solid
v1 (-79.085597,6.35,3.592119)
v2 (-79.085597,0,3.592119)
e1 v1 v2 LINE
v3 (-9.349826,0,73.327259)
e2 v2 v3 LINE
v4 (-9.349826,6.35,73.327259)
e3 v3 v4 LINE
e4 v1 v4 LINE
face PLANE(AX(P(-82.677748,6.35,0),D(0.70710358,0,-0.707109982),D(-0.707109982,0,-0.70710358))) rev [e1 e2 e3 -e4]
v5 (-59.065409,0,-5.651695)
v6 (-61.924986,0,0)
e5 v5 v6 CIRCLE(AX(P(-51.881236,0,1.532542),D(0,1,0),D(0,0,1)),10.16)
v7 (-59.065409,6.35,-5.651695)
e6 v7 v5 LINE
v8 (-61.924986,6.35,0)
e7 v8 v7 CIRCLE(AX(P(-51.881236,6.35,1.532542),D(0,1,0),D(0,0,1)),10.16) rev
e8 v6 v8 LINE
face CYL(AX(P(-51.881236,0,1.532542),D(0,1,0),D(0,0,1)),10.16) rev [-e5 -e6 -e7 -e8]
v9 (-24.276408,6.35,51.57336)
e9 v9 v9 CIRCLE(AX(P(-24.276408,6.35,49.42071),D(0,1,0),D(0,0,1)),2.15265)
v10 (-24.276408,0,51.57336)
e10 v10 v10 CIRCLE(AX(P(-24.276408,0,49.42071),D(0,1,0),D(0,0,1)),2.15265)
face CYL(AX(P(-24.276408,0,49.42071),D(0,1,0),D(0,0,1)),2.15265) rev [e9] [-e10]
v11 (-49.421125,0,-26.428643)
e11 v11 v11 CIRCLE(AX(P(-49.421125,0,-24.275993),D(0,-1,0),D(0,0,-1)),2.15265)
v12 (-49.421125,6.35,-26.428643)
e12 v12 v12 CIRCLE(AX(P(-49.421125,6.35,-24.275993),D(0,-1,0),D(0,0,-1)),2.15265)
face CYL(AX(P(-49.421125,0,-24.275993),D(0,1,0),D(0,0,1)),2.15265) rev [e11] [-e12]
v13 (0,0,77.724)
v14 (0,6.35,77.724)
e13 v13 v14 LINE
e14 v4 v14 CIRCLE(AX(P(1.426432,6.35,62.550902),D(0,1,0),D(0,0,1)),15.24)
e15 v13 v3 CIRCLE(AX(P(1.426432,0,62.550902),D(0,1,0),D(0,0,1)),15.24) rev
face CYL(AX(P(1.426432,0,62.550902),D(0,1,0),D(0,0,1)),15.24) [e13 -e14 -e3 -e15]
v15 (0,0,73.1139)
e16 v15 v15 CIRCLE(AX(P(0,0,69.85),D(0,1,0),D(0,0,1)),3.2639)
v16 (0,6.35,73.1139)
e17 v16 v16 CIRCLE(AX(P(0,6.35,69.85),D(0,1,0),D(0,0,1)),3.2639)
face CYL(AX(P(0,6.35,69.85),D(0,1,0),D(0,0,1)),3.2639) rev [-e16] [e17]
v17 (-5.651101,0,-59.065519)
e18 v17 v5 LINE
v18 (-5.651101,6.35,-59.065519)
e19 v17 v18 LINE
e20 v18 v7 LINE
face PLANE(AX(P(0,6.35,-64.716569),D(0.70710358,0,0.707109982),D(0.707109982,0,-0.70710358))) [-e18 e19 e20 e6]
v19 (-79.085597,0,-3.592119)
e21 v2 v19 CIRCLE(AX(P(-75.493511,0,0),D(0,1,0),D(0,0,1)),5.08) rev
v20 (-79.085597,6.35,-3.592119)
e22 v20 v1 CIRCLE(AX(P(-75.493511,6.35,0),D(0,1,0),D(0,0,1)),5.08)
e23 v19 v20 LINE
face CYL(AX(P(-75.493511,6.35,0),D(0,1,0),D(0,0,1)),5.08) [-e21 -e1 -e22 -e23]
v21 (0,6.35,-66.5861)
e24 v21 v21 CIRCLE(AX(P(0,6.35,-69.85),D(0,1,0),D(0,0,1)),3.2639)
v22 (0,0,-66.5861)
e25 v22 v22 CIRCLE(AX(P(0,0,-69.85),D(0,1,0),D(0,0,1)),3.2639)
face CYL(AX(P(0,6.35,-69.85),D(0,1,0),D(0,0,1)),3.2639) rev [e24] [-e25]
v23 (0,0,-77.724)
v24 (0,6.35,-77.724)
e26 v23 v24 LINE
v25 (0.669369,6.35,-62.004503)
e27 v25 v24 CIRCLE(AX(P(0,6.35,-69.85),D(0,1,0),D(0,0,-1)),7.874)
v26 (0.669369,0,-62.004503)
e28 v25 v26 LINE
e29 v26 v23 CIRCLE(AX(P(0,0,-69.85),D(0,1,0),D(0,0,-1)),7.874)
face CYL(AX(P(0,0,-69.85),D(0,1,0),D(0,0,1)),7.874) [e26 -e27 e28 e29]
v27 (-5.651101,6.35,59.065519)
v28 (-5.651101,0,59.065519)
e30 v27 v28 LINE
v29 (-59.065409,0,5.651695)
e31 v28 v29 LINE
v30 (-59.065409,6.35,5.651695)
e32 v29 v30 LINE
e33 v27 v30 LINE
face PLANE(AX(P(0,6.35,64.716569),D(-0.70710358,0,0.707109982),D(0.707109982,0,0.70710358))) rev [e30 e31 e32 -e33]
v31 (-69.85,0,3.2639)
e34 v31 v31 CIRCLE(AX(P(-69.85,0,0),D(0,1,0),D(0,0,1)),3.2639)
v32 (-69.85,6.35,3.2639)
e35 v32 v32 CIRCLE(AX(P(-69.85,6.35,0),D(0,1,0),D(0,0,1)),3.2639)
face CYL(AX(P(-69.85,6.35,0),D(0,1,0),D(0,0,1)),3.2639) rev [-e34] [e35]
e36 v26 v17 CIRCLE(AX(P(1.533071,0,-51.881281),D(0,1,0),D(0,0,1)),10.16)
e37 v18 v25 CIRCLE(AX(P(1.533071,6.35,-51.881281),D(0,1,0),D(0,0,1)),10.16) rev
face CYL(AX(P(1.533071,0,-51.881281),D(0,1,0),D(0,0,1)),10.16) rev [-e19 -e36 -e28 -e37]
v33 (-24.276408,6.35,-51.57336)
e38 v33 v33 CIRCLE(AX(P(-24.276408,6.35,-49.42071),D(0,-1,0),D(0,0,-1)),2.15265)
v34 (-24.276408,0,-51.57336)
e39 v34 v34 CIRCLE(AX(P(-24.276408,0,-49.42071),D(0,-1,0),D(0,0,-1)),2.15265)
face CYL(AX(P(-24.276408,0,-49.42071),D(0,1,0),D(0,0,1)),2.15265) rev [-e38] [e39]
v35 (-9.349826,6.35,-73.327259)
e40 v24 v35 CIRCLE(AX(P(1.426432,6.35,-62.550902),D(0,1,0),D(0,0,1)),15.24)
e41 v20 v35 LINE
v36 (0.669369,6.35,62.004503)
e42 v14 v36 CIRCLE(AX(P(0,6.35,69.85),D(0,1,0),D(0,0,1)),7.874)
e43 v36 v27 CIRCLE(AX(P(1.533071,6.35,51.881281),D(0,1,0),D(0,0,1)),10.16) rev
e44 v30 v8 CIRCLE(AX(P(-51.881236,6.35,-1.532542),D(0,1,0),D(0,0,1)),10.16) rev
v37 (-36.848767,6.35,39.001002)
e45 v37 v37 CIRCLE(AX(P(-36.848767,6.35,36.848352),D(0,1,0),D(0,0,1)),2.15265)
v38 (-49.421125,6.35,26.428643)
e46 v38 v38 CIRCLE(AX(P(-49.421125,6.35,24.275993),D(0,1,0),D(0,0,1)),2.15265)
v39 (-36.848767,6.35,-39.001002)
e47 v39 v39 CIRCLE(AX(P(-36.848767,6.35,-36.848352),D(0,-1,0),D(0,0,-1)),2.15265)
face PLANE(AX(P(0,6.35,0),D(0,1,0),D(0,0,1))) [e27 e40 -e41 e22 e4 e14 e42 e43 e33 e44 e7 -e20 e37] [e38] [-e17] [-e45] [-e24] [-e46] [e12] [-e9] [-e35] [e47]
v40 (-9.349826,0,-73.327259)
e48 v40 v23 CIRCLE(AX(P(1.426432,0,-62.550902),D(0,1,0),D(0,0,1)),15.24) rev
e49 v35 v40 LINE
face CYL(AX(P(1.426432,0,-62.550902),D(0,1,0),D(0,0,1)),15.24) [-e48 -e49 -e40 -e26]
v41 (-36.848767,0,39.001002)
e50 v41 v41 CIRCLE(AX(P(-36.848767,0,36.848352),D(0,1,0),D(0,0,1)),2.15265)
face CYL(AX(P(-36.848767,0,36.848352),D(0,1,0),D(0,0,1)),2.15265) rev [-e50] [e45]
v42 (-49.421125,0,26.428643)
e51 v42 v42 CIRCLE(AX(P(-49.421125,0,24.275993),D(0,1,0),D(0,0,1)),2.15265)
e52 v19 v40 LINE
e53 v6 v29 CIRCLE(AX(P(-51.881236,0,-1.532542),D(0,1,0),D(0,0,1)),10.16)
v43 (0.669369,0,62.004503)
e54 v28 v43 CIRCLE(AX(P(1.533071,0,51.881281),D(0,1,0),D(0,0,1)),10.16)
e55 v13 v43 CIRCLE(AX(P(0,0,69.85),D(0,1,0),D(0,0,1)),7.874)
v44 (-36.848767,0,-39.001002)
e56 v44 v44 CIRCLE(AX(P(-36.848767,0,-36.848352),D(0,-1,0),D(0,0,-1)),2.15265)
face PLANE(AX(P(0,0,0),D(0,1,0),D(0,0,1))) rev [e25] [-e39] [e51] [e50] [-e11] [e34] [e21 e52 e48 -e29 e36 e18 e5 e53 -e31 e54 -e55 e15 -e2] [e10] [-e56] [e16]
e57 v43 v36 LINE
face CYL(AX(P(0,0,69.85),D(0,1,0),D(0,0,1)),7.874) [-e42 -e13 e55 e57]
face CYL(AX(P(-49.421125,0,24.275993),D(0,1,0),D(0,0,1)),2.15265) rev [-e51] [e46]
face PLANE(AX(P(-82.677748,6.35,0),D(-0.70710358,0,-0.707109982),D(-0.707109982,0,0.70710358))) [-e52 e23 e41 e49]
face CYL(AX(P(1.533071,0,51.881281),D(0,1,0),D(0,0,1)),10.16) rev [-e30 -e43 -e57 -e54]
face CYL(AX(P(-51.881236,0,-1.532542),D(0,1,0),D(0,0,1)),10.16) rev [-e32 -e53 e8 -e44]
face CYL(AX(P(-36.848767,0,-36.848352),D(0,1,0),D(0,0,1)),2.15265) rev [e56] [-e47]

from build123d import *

# Parameters (mm, degrees)
BOSS_EXTRUDE2_DEPTH = 6.35
SKETCH6_R           = 7.874
BOSS_EXTRUDE3_DEPTH = 6.35
CIRPATTERN1_COUNT   = 3
CIRPATTERN1_ANGLE   = 180
SKETCH7_R           = 2.15265
CUT_EXTRUDE1_DEPTH  = 118.095768176
FILLET1_R           = 15.24
FILLET2_R           = 10.16
FILLET3_R           = 5.08


with BuildPart() as part:
    # Sketch1 → Boss-Extrude2 (new body)
    with BuildSketch(Plane(origin=(0, 0, 0), x_dir=(1, 0, 0), z_dir=(0, 1, 0))):
        Polygon((-82.677748493, 0), (0, -82.677), (0, -64.716569057), (-64.71715495, 0), align=None)
    boss_extrude2 = extrude(amount=BOSS_EXTRUDE2_DEPTH)

    # Mirror1: Boss-Extrude2 across plane
    add(boss_extrude2.mirror(Plane.XY))

    # Sketch6 → Boss-Extrude3 (add)
    with BuildSketch(Plane(origin=(0, 6.35, 0), x_dir=(1, 0, 0), z_dir=(0, 1, 0))):
        with Locations((0, -69.85)):
            Circle(SKETCH6_R)
    boss_extrude3 = extrude(amount=-BOSS_EXTRUDE3_DEPTH)

    # Sketch5 → F (0.257) Diameter Hole1 (revolve, cut)
    with BuildSketch(Plane(origin=(0, 6.35, 69.85), x_dir=(0, 0, 1), z_dir=(1, 0, 0))):
        Polygon((0, 0), (0, 52.761148974), (3.2639, 50.8), (3.2639, 0), align=None)
    f_0_257_diameter_hole1 = revolve(axis=Axis((0, 12.7, 69.85), (0, -1, 0)), mode=Mode.SUBTRACT)

    # CirPattern1: Boss-Extrude3, F (0.257) Diameter Hole1 ×3 about axis
    cirpattern1_axis = Axis((0, 0, 0), (0, -1, 0))
    add([boss_extrude3.rotate(cirpattern1_axis, i * CIRPATTERN1_ANGLE / (CIRPATTERN1_COUNT - 1)) for i in range(1, CIRPATTERN1_COUNT)])
    add([f_0_257_diameter_hole1.rotate(cirpattern1_axis, i * CIRPATTERN1_ANGLE / (CIRPATTERN1_COUNT - 1)) for i in range(1, CIRPATTERN1_COUNT)], mode=Mode.SUBTRACT)

    # Sketch7 → Cut-Extrude1 (cut, through all)
    with BuildSketch(Plane(origin=(0, 6.35, 0), x_dir=(1, 0, 0), z_dir=(0, 1, 0))):
        with Locations(Location((-36.848766511, -36.848351615, 0), (0, 0, 270))):
            Circle(SKETCH7_R)
        with Locations(Location((-49.42112508, -24.275993045, 0), (0, 0, 270))):
            Circle(SKETCH7_R)
        with Locations(Location((-24.276407941, -49.420710184, 0), (0, 0, 270))):
            Circle(SKETCH7_R)
    cut_extrude1 = extrude(amount=-CUT_EXTRUDE1_DEPTH, mode=Mode.SUBTRACT)

    # Mirror2: Cut-Extrude1 across plane
    add(cut_extrude1.mirror(Plane.XY), mode=Mode.SUBTRACT)

    # Fillet1
    # the kernel refuses this fillet: 15.24 mm, written as the material it takes off along each edge
    with BuildSketch(Plane(origin=(0, -33.056477591, 82.677), x_dir=(-0.7071099819596415, 0, -0.707103580398965), z_dir=(0, 1, 0))) as fillet1_piece_1:
        with BuildLine():
            CenterArc((13.222591036, -15.24), FILLET1_R, 90, 39.629113094)
            Line((3.502284034, -3.502315741), (0, 0))
            Line((0, 0), (13.222591036, 0))
        make_face()
    extrude(amount=72.462955182, mode=Mode.SUBTRACT)
    with BuildSketch(Plane(origin=(0, -33.056477591, -82.677), x_dir=(-0.7071099819596415, 0, 0.707103580398965), z_dir=(0, 1, 0))) as fillet1_piece_2:
        with BuildLine():
            CenterArc((13.222591036, 15.24), FILLET1_R, 230.370886906, 39.629113094)
            Line((3.502284034, 3.502315741), (0, 0))
            Line((0, 0), (13.222591036, 0))
        make_face()
    extrude(amount=72.462955182, mode=Mode.SUBTRACT)

    # Fillet2
    # the kernel refuses this fillet: 10.16 mm, written as the material it adds along each edge
    with BuildSketch(Plane(origin=(-62.342579148, 0, 2.374554305), x_dir=(0.11040173938387075, 0, -0.9938870438540871), z_dir=(0, 1, 0))) as fillet2_piece_1:
        with BuildLine():
            CenterArc((5.03816312, -9.966042895), FILLET2_R, 101.213390693, 40.125343256)
            Line((-2.895302495, -3.618939355), (0, 0))
            ThreePointArc((0, 0), (1.531206438, -0.150316757), (3.062412877, 0))
        make_face()
    extrude(amount=6.35)
    with BuildSketch(Plane(origin=(-62.342579148, 0, -2.374554305), x_dir=(0.7071099819596407, 0, -0.7071035803989658), z_dir=(0, 1, 0))) as fillet2_piece_2:
        with BuildLine():
            CenterArc((4.634597997, -10.16), FILLET2_R, 90, 40.125343256)
            ThreePointArc((-1.913135001, -2.391294021), (-0.839192223, -1.289552131), (0, 0))
            Line((0, 0), (4.634597997, 0))
        make_face()
    extrude(amount=6.35)
    with BuildSketch(Plane(origin=(-2.374141848, 0, -62.342448702), x_dir=(0.9938916997559154, 0, 0.11035981676451387), z_dir=(0, 1, 0))) as fillet2_piece_3:
        with BuildLine():
            CenterArc((5.037838868, -9.966068103), FILLET2_R, 101.212659653, 40.12313883)
            Line((-2.895301552, -3.618558112), (0, 0))
            ThreePointArc((0, 0), (1.531107891, -0.150297221), (3.062215783, 0))
        make_face()
    extrude(amount=6.35)
    with BuildSketch(Plane(origin=(-2.374141848, 0, 62.342448702), x_dir=(-0.7071099819596428, 0, -0.7071035803989636), z_dir=(0, 1, 0))) as fillet2_piece_4:
        with BuildLine():
            CenterArc((4.634299719, -10.16), FILLET2_R, 90, 40.12313883)
            ThreePointArc((-1.913134377, -2.391042106), (-0.839211976, -1.289419981), (0, 0))
            Line((0, 0), (4.634299719, 0))
        make_face()
    extrude(amount=6.35)

    # Fillet3
    fillet3_edges = [part.edges().sort_by_distance(p)[0] for p in [
        (-82.677748493, 3.175, 0),
    ]]
    fillet(fillet3_edges, radius=FILLET3_R)


solid = part.part
